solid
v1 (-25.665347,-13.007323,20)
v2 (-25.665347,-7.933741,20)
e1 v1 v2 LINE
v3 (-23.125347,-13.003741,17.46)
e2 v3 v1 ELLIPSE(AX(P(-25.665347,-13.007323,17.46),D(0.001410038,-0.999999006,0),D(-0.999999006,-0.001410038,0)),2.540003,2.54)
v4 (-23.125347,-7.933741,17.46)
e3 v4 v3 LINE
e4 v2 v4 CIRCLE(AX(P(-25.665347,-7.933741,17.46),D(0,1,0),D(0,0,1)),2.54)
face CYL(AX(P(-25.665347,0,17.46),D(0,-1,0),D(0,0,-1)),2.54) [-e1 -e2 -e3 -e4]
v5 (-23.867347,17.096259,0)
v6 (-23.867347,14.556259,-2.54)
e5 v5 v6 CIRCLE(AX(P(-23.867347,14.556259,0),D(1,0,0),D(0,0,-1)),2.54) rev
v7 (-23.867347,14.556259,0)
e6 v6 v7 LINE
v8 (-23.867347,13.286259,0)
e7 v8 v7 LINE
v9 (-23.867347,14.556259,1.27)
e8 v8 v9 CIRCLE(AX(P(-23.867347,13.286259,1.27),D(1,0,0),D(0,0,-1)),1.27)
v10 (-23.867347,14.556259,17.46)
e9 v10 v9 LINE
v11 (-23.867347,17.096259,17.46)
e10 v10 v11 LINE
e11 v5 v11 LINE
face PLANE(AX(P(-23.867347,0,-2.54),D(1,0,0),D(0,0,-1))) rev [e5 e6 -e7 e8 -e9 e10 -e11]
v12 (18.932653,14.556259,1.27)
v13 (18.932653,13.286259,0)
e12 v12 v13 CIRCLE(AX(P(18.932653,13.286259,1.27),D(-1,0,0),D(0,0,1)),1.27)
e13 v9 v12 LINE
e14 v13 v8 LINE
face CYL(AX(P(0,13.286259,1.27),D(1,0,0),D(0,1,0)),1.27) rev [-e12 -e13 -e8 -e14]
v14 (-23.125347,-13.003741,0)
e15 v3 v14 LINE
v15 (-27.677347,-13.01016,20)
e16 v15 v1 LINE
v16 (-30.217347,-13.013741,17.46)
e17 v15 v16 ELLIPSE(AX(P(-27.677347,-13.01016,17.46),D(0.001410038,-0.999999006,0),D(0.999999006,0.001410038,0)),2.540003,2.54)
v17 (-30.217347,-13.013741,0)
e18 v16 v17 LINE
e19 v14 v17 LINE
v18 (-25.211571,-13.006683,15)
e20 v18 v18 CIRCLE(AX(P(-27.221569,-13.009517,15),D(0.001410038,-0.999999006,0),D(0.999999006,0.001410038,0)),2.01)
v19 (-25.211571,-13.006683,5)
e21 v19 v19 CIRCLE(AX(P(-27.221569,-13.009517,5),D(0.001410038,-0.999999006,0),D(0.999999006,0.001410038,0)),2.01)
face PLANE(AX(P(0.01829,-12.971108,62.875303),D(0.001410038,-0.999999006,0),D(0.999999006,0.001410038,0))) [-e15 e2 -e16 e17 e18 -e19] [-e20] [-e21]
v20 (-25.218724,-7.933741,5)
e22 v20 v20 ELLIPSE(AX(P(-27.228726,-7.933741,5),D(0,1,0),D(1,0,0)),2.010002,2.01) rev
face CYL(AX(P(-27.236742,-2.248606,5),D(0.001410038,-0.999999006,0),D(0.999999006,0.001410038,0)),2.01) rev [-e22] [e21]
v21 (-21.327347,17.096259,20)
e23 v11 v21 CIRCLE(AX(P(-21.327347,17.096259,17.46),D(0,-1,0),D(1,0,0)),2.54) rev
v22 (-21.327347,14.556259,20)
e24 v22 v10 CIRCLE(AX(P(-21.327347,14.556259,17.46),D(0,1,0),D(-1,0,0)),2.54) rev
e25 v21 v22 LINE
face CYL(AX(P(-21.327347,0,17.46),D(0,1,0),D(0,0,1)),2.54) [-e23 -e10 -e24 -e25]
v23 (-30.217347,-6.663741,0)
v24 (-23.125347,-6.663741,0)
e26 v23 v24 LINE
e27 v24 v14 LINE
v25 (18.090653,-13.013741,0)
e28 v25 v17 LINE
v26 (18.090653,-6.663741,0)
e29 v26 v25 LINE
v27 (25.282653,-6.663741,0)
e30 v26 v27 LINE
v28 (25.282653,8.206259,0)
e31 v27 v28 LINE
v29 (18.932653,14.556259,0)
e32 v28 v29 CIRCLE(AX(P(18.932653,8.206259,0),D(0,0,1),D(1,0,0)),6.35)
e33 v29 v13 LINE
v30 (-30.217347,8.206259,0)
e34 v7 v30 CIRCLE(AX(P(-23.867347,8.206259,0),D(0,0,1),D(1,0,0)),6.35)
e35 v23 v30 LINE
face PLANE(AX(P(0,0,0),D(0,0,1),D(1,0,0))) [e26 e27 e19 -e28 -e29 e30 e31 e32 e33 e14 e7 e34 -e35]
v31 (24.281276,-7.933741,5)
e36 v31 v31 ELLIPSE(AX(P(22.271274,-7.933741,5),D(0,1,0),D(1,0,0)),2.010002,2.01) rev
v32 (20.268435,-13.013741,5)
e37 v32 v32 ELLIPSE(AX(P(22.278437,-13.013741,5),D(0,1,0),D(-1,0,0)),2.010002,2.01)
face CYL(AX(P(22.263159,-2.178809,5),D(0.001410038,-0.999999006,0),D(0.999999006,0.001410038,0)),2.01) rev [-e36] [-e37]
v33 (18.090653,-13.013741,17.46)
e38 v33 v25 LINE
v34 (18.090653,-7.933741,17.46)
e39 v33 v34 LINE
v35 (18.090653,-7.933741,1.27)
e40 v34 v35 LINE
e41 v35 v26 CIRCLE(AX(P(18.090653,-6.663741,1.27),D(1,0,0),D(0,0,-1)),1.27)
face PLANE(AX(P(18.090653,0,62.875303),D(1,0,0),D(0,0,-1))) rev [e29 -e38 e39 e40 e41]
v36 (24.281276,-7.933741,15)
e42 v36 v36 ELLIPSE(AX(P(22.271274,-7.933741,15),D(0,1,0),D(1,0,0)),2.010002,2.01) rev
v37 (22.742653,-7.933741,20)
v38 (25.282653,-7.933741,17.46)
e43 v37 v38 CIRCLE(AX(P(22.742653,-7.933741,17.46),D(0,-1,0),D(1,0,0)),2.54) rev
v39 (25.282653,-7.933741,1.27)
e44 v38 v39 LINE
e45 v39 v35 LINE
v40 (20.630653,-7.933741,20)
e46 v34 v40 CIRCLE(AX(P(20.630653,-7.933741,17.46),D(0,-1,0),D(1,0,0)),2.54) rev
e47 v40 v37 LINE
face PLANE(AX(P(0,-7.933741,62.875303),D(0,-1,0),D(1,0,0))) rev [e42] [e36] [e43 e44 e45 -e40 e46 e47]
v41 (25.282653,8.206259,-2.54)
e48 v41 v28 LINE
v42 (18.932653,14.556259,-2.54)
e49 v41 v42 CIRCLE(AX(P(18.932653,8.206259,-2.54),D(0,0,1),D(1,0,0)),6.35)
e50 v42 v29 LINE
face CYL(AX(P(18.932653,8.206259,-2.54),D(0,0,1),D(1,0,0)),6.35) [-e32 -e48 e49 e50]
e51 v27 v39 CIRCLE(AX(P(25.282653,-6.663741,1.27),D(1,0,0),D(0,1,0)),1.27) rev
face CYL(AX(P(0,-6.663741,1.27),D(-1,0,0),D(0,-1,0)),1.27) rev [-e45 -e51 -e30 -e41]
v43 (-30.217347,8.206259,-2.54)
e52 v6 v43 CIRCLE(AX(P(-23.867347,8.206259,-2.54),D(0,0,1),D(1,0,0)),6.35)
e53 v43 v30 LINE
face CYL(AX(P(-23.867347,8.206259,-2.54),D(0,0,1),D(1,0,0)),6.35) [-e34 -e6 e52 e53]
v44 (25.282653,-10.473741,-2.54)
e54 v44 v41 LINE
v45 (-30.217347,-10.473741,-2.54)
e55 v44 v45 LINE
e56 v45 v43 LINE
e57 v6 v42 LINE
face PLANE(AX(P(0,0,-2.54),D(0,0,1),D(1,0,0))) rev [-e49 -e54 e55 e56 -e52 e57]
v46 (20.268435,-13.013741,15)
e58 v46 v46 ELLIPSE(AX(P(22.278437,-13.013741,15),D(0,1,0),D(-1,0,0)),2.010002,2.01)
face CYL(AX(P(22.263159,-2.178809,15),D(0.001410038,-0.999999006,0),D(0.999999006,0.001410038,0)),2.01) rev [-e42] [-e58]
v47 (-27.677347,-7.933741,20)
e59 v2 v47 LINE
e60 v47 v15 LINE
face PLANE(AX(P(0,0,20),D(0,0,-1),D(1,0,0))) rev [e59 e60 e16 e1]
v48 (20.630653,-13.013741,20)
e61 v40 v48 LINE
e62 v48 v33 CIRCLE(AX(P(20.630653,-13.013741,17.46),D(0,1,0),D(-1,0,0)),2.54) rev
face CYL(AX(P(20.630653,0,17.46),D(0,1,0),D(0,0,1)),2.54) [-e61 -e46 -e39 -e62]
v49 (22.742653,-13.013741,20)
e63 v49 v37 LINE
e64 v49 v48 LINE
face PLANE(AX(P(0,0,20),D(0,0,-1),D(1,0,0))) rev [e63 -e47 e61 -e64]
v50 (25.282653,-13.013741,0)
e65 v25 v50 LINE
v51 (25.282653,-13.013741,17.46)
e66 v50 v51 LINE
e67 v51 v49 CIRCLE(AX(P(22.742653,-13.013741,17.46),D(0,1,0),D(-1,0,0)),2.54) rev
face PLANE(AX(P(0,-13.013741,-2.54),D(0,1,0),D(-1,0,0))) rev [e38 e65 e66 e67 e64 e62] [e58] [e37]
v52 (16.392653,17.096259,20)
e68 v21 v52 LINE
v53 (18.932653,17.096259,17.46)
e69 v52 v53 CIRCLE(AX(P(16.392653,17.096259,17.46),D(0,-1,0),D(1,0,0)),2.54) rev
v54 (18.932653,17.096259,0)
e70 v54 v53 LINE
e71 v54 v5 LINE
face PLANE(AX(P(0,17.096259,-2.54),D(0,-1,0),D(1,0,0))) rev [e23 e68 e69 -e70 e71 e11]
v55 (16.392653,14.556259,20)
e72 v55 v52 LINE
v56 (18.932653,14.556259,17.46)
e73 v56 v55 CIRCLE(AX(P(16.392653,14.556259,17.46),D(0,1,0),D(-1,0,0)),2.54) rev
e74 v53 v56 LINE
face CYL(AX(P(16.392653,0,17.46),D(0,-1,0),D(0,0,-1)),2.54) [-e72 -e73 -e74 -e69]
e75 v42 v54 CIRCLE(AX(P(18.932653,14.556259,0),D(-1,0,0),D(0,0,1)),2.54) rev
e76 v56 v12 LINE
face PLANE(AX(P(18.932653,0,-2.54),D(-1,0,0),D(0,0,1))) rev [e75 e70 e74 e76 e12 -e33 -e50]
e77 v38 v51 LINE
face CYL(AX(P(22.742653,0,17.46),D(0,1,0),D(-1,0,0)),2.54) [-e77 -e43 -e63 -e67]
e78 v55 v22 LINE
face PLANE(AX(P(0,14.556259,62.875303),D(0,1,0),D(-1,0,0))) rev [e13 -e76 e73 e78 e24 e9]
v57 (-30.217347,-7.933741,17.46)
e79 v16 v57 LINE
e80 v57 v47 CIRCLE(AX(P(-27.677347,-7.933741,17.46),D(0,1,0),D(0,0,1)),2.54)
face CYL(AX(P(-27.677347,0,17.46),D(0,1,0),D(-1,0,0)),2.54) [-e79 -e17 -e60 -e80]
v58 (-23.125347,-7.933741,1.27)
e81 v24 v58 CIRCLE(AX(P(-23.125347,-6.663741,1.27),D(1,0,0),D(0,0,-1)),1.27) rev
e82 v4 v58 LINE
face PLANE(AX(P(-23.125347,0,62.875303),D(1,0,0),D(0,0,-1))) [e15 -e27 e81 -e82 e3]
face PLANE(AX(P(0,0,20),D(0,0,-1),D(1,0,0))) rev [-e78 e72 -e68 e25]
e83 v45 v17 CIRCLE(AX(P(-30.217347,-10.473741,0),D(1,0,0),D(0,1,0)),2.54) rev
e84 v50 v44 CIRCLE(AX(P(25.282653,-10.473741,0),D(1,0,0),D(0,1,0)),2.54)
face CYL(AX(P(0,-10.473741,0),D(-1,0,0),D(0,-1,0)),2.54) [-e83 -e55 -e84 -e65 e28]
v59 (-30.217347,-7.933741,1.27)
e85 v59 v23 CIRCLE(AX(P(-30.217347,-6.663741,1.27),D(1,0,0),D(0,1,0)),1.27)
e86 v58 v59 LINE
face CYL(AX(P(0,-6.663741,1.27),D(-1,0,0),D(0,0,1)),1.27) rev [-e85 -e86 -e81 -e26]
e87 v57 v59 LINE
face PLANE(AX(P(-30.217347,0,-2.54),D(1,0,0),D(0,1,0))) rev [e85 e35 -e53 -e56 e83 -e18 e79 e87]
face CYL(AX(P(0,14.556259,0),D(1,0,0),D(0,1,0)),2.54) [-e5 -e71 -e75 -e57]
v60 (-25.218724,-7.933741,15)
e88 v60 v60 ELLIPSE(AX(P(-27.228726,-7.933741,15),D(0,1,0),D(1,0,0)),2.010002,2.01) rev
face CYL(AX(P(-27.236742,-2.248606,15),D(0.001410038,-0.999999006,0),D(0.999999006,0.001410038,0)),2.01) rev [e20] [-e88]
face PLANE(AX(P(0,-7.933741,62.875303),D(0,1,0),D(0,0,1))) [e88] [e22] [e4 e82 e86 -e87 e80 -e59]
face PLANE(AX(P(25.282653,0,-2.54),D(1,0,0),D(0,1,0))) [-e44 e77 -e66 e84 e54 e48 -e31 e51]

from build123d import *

# Parameters (mm, degrees)
SKETCH2_W                      = 42.8
SKETCH2_H                      = 2.54
BOSS_EXTRUDE1_DEPTH            = 2.54
SKETCH7_W                      = 7.192
SKETCH7_H                      = 5.08
SKETCH7_W_2                    = 42.8
SKETCH7_H_2                    = 2.54
BOSS_EXTRUDE3_DEPTH            = 20
FILLET3_R                      = 2.54
FILLET4_R                      = 1.27
CUT_EXTRUDE2_REACH             = 49.098
SKETCH8_R                      = 2.01
CUT_EXTRUDE2_DIRECTION_2_REACH = 49.098


# Some blends are built 0.0001 mm under size
with BuildPart() as part:
    # Sketch2 → Boss-Extrude1 (new body)
    with BuildSketch(Plane.XY):
        with Locations((-2.467346939, 15.826258503)):
            Rectangle(SKETCH2_W, SKETCH2_H)
        with BuildLine():
            Line((18.932653061, 14.556258503), (-23.867346939, 14.556258503))
            ThreePointArc((-23.867346939, 14.556258503), (-28.357474999, 12.696386564), (-30.217346939, 8.206258503))
            Line((-30.217346939, 8.206258503), (-30.217346939, -13.013741497))
            Line((-30.217346939, -13.013741497), (25.282653061, -13.013741497))
            Line((25.282653061, -13.013741497), (25.282653061, 8.206258503))
            ThreePointArc((25.282653061, 8.206258503), (23.422781122, 12.696386564), (18.932653061, 14.556258503))
        make_face()
    extrude(amount=-BOSS_EXTRUDE1_DEPTH)

    # Sketch7 → Boss-Extrude3 (add)
    with BuildSketch(Plane.XY):
        Polygon((-30.217346939, -7.933741497), (-30.217346939, -13.013741497), (-23.125346939, -13.003741497), (-23.125346939, -7.933741497), align=None)
        with Locations((21.686653061, -10.473741497)):
            Rectangle(SKETCH7_W, SKETCH7_H)
        with Locations((-2.467346939, 15.826258503)):
            Rectangle(SKETCH7_W_2, SKETCH7_H_2)
    extrude(amount=BOSS_EXTRUDE3_DEPTH)

    # Fillet3
    fillet3_edges = [part.edges().sort_by_distance(p)[0] for p in [
        (-2.467346939, 17.096258503, -2.54),
        (18.932653061, 15.826258503, 20),
        (-23.867346939, 15.826258503, 20),
        (-2.467346939, -13.013741497, -2.54),
        (18.090653061, -10.473741497, 20),
        (25.282653061, -10.473741497, 20),
        (-23.125346939, -10.468741497, 20),
        (-30.217346939, -10.473741497, 20),
    ]]
    fillet(fillet3_edges, radius=FILLET3_R - 0.0001)  # a hair under: the kernel refuses the full size

    # Fillet4
    # the kernel refuses this fillet: 1.27 mm, written as the material it adds along each edge
    with BuildSketch(Plane(origin=(-23.125346939, -7.933741497, 0), x_dir=(0, 1, 0), z_dir=(-1, 0, 0))) as fillet4_piece_1:
        with BuildLine():
            CenterArc((FILLET4_R, -FILLET4_R), FILLET4_R, 90, 90)
            Line((0, -FILLET4_R), (0, 0))
            Line((0, 0), (FILLET4_R, 0))
        make_face()
    extrude(amount=7.092)
    with BuildSketch(Plane(origin=(25.282653061, -7.933741497, 0), x_dir=(0, 1, 0), z_dir=(-1, 0, 0))) as fillet4_piece_2:
        with BuildLine():
            CenterArc((FILLET4_R, -FILLET4_R), FILLET4_R, 90, 90)
            Line((0, -FILLET4_R), (0, 0))
            Line((0, 0), (FILLET4_R, 0))
        make_face()
    extrude(amount=7.192)
    with BuildSketch(Plane(origin=(-23.867346939, 14.556258503, 0), x_dir=(0, 0, 1), z_dir=(1, 0, 0))) as fillet4_piece_3:
        with BuildLine():
            CenterArc((FILLET4_R, FILLET4_R), FILLET4_R, 180, 90)
            Line((0, FILLET4_R), (0, 0))
            Line((0, 0), (FILLET4_R, 0))
        make_face()
    extrude(amount=42.8)

    # Cut-Extrude2: up to this face of the body (flat: up to its plane)
    cut_extrude2_end = Plane(part.part.faces().sort_by_distance((-26.671346939, -7.933741497, 10.447713694))[0])
    # Sketch8 → Cut-Extrude2 (cut, up to the picked face)
    with BuildSketch(Plane(origin=(0.018289774, -12.971108055, 0), x_dir=(0.9999990058958133, 0.0014100380793790163, 0), z_dir=(0.0014100380793790163, -0.9999990058958133, 0)), mode=Mode.PRIVATE) as cut_extrude2_sk1:
        with Locations((-27.239885767, 5)):
            Circle(SKETCH8_R)
    cut_extrude2_tool1 = split(extrude(cut_extrude2_sk1.sketch, amount=-CUT_EXTRUDE2_REACH, mode=Mode.PRIVATE), bisect_by=cut_extrude2_end, keep=Keep.BOTH, mode=Mode.PRIVATE)
    # Sketch8 → Cut-Extrude2 (cut, up to the picked face)
    with BuildSketch(Plane(origin=(0.018289774, -12.971108055, 0), x_dir=(0.9999990058958133, 0.0014100380793790163, 0), z_dir=(0.0014100380793790163, -0.9999990058958133, 0)), mode=Mode.PRIVATE) as cut_extrude2_sk2:
        with Locations((22.260065025, 5)):
            Circle(SKETCH8_R)
    cut_extrude2_tool2 = split(extrude(cut_extrude2_sk2.sketch, amount=-CUT_EXTRUDE2_REACH, mode=Mode.PRIVATE), bisect_by=cut_extrude2_end, keep=Keep.BOTH, mode=Mode.PRIVATE)
    # Sketch8 → Cut-Extrude2 (cut, up to the picked face)
    with BuildSketch(Plane(origin=(0.018289774, -12.971108055, 0), x_dir=(0.9999990058958133, 0.0014100380793790163, 0), z_dir=(0.0014100380793790163, -0.9999990058958133, 0)), mode=Mode.PRIVATE) as cut_extrude2_sk3:
        with Locations((22.260065025, 15)):
            Circle(SKETCH8_R)
    cut_extrude2_tool3 = split(extrude(cut_extrude2_sk3.sketch, amount=-CUT_EXTRUDE2_REACH, mode=Mode.PRIVATE), bisect_by=cut_extrude2_end, keep=Keep.BOTH, mode=Mode.PRIVATE)
    # Sketch8 → Cut-Extrude2 (cut, up to the picked face)
    with BuildSketch(Plane(origin=(0.018289774, -12.971108055, 0), x_dir=(0.9999990058958133, 0.0014100380793790163, 0), z_dir=(0.0014100380793790163, -0.9999990058958133, 0)), mode=Mode.PRIVATE) as cut_extrude2_sk4:
        with Locations((-27.239885767, 15)):
            Circle(SKETCH8_R)
    cut_extrude2_tool4 = split(extrude(cut_extrude2_sk4.sketch, amount=-CUT_EXTRUDE2_REACH, mode=Mode.PRIVATE), bisect_by=cut_extrude2_end, keep=Keep.BOTH, mode=Mode.PRIVATE)
    add(cut_extrude2_tool1.solids().sort_by(Axis((-27.221569, -13.009517, 5), (-0.0014100380793790163, 0.9999990058958133, 0)))[0], mode=Mode.SUBTRACT)
    add(cut_extrude2_tool2.solids().sort_by(Axis((22.278333, -12.939721, 5), (-0.0014100380793790163, 0.9999990058958133, 0)))[0], mode=Mode.SUBTRACT)
    add(cut_extrude2_tool3.solids().sort_by(Axis((22.278333, -12.939721, 15), (-0.0014100380793790163, 0.9999990058958133, 0)))[0], mode=Mode.SUBTRACT)
    add(cut_extrude2_tool4.solids().sort_by(Axis((-27.221569, -13.009517, 15), (-0.0014100380793790163, 0.9999990058958133, 0)))[0], mode=Mode.SUBTRACT)

    # Cut-Extrude2 direction 2: up to this face of the body (flat: up to its plane)
    cut_extrude2_direction_2_end = Plane(part.part.faces().sort_by_distance((21.685702836, -13.013741497, 9.814476997))[0])
    # Sketch8 → Cut-Extrude2 direction 2 (cut, up to the picked face)
    with BuildSketch(Plane(origin=(0.018289774, -12.971108055, 0), x_dir=(0.9999990058958133, 0.0014100380793790163, 0), z_dir=(0.0014100380793790163, -0.9999990058958133, 0)), mode=Mode.PRIVATE) as cut_extrude2_direction_2_sk1:
        with Locations((-27.239885767, 5)):
            Circle(SKETCH8_R)
    cut_extrude2_direction_2_tool1 = split(extrude(cut_extrude2_direction_2_sk1.sketch, amount=CUT_EXTRUDE2_DIRECTION_2_REACH, mode=Mode.PRIVATE), bisect_by=cut_extrude2_direction_2_end, keep=Keep.BOTH, mode=Mode.PRIVATE)
    # Sketch8 → Cut-Extrude2 direction 2 (cut, up to the picked face)
    with BuildSketch(Plane(origin=(0.018289774, -12.971108055, 0), x_dir=(0.9999990058958133, 0.0014100380793790163, 0), z_dir=(0.0014100380793790163, -0.9999990058958133, 0)), mode=Mode.PRIVATE) as cut_extrude2_direction_2_sk2:
        with Locations((22.260065025, 5)):
            Circle(SKETCH8_R)
    cut_extrude2_direction_2_tool2 = split(extrude(cut_extrude2_direction_2_sk2.sketch, amount=CUT_EXTRUDE2_DIRECTION_2_REACH, mode=Mode.PRIVATE), bisect_by=cut_extrude2_direction_2_end, keep=Keep.BOTH, mode=Mode.PRIVATE)
    # Sketch8 → Cut-Extrude2 direction 2 (cut, up to the picked face)
    with BuildSketch(Plane(origin=(0.018289774, -12.971108055, 0), x_dir=(0.9999990058958133, 0.0014100380793790163, 0), z_dir=(0.0014100380793790163, -0.9999990058958133, 0)), mode=Mode.PRIVATE) as cut_extrude2_direction_2_sk3:
        with Locations((22.260065025, 15)):
            Circle(SKETCH8_R)
    cut_extrude2_direction_2_tool3 = split(extrude(cut_extrude2_direction_2_sk3.sketch, amount=CUT_EXTRUDE2_DIRECTION_2_REACH, mode=Mode.PRIVATE), bisect_by=cut_extrude2_direction_2_end, keep=Keep.BOTH, mode=Mode.PRIVATE)
    # Sketch8 → Cut-Extrude2 direction 2 (cut, up to the picked face)
    with BuildSketch(Plane(origin=(0.018289774, -12.971108055, 0), x_dir=(0.9999990058958133, 0.0014100380793790163, 0), z_dir=(0.0014100380793790163, -0.9999990058958133, 0)), mode=Mode.PRIVATE) as cut_extrude2_direction_2_sk4:
        with Locations((-27.239885767, 15)):
            Circle(SKETCH8_R)
    cut_extrude2_direction_2_tool4 = split(extrude(cut_extrude2_direction_2_sk4.sketch, amount=CUT_EXTRUDE2_DIRECTION_2_REACH, mode=Mode.PRIVATE), bisect_by=cut_extrude2_direction_2_end, keep=Keep.BOTH, mode=Mode.PRIVATE)
    add(cut_extrude2_direction_2_tool1.solids().sort_by(Axis((-27.221569, -13.009517, 5), (0.0014100380793790163, -0.9999990058958133, 0)))[0], mode=Mode.SUBTRACT)
    add(cut_extrude2_direction_2_tool2.solids().sort_by(Axis((22.278333, -12.939721, 5), (0.0014100380793790163, -0.9999990058958133, 0)))[0], mode=Mode.SUBTRACT)
    add(cut_extrude2_direction_2_tool3.solids().sort_by(Axis((22.278333, -12.939721, 15), (0.0014100380793790163, -0.9999990058958133, 0)))[0], mode=Mode.SUBTRACT)
    add(cut_extrude2_direction_2_tool4.solids().sort_by(Axis((-27.221569, -13.009517, 15), (0.0014100380793790163, -0.9999990058958133, 0)))[0], mode=Mode.SUBTRACT)


solid = part.part
